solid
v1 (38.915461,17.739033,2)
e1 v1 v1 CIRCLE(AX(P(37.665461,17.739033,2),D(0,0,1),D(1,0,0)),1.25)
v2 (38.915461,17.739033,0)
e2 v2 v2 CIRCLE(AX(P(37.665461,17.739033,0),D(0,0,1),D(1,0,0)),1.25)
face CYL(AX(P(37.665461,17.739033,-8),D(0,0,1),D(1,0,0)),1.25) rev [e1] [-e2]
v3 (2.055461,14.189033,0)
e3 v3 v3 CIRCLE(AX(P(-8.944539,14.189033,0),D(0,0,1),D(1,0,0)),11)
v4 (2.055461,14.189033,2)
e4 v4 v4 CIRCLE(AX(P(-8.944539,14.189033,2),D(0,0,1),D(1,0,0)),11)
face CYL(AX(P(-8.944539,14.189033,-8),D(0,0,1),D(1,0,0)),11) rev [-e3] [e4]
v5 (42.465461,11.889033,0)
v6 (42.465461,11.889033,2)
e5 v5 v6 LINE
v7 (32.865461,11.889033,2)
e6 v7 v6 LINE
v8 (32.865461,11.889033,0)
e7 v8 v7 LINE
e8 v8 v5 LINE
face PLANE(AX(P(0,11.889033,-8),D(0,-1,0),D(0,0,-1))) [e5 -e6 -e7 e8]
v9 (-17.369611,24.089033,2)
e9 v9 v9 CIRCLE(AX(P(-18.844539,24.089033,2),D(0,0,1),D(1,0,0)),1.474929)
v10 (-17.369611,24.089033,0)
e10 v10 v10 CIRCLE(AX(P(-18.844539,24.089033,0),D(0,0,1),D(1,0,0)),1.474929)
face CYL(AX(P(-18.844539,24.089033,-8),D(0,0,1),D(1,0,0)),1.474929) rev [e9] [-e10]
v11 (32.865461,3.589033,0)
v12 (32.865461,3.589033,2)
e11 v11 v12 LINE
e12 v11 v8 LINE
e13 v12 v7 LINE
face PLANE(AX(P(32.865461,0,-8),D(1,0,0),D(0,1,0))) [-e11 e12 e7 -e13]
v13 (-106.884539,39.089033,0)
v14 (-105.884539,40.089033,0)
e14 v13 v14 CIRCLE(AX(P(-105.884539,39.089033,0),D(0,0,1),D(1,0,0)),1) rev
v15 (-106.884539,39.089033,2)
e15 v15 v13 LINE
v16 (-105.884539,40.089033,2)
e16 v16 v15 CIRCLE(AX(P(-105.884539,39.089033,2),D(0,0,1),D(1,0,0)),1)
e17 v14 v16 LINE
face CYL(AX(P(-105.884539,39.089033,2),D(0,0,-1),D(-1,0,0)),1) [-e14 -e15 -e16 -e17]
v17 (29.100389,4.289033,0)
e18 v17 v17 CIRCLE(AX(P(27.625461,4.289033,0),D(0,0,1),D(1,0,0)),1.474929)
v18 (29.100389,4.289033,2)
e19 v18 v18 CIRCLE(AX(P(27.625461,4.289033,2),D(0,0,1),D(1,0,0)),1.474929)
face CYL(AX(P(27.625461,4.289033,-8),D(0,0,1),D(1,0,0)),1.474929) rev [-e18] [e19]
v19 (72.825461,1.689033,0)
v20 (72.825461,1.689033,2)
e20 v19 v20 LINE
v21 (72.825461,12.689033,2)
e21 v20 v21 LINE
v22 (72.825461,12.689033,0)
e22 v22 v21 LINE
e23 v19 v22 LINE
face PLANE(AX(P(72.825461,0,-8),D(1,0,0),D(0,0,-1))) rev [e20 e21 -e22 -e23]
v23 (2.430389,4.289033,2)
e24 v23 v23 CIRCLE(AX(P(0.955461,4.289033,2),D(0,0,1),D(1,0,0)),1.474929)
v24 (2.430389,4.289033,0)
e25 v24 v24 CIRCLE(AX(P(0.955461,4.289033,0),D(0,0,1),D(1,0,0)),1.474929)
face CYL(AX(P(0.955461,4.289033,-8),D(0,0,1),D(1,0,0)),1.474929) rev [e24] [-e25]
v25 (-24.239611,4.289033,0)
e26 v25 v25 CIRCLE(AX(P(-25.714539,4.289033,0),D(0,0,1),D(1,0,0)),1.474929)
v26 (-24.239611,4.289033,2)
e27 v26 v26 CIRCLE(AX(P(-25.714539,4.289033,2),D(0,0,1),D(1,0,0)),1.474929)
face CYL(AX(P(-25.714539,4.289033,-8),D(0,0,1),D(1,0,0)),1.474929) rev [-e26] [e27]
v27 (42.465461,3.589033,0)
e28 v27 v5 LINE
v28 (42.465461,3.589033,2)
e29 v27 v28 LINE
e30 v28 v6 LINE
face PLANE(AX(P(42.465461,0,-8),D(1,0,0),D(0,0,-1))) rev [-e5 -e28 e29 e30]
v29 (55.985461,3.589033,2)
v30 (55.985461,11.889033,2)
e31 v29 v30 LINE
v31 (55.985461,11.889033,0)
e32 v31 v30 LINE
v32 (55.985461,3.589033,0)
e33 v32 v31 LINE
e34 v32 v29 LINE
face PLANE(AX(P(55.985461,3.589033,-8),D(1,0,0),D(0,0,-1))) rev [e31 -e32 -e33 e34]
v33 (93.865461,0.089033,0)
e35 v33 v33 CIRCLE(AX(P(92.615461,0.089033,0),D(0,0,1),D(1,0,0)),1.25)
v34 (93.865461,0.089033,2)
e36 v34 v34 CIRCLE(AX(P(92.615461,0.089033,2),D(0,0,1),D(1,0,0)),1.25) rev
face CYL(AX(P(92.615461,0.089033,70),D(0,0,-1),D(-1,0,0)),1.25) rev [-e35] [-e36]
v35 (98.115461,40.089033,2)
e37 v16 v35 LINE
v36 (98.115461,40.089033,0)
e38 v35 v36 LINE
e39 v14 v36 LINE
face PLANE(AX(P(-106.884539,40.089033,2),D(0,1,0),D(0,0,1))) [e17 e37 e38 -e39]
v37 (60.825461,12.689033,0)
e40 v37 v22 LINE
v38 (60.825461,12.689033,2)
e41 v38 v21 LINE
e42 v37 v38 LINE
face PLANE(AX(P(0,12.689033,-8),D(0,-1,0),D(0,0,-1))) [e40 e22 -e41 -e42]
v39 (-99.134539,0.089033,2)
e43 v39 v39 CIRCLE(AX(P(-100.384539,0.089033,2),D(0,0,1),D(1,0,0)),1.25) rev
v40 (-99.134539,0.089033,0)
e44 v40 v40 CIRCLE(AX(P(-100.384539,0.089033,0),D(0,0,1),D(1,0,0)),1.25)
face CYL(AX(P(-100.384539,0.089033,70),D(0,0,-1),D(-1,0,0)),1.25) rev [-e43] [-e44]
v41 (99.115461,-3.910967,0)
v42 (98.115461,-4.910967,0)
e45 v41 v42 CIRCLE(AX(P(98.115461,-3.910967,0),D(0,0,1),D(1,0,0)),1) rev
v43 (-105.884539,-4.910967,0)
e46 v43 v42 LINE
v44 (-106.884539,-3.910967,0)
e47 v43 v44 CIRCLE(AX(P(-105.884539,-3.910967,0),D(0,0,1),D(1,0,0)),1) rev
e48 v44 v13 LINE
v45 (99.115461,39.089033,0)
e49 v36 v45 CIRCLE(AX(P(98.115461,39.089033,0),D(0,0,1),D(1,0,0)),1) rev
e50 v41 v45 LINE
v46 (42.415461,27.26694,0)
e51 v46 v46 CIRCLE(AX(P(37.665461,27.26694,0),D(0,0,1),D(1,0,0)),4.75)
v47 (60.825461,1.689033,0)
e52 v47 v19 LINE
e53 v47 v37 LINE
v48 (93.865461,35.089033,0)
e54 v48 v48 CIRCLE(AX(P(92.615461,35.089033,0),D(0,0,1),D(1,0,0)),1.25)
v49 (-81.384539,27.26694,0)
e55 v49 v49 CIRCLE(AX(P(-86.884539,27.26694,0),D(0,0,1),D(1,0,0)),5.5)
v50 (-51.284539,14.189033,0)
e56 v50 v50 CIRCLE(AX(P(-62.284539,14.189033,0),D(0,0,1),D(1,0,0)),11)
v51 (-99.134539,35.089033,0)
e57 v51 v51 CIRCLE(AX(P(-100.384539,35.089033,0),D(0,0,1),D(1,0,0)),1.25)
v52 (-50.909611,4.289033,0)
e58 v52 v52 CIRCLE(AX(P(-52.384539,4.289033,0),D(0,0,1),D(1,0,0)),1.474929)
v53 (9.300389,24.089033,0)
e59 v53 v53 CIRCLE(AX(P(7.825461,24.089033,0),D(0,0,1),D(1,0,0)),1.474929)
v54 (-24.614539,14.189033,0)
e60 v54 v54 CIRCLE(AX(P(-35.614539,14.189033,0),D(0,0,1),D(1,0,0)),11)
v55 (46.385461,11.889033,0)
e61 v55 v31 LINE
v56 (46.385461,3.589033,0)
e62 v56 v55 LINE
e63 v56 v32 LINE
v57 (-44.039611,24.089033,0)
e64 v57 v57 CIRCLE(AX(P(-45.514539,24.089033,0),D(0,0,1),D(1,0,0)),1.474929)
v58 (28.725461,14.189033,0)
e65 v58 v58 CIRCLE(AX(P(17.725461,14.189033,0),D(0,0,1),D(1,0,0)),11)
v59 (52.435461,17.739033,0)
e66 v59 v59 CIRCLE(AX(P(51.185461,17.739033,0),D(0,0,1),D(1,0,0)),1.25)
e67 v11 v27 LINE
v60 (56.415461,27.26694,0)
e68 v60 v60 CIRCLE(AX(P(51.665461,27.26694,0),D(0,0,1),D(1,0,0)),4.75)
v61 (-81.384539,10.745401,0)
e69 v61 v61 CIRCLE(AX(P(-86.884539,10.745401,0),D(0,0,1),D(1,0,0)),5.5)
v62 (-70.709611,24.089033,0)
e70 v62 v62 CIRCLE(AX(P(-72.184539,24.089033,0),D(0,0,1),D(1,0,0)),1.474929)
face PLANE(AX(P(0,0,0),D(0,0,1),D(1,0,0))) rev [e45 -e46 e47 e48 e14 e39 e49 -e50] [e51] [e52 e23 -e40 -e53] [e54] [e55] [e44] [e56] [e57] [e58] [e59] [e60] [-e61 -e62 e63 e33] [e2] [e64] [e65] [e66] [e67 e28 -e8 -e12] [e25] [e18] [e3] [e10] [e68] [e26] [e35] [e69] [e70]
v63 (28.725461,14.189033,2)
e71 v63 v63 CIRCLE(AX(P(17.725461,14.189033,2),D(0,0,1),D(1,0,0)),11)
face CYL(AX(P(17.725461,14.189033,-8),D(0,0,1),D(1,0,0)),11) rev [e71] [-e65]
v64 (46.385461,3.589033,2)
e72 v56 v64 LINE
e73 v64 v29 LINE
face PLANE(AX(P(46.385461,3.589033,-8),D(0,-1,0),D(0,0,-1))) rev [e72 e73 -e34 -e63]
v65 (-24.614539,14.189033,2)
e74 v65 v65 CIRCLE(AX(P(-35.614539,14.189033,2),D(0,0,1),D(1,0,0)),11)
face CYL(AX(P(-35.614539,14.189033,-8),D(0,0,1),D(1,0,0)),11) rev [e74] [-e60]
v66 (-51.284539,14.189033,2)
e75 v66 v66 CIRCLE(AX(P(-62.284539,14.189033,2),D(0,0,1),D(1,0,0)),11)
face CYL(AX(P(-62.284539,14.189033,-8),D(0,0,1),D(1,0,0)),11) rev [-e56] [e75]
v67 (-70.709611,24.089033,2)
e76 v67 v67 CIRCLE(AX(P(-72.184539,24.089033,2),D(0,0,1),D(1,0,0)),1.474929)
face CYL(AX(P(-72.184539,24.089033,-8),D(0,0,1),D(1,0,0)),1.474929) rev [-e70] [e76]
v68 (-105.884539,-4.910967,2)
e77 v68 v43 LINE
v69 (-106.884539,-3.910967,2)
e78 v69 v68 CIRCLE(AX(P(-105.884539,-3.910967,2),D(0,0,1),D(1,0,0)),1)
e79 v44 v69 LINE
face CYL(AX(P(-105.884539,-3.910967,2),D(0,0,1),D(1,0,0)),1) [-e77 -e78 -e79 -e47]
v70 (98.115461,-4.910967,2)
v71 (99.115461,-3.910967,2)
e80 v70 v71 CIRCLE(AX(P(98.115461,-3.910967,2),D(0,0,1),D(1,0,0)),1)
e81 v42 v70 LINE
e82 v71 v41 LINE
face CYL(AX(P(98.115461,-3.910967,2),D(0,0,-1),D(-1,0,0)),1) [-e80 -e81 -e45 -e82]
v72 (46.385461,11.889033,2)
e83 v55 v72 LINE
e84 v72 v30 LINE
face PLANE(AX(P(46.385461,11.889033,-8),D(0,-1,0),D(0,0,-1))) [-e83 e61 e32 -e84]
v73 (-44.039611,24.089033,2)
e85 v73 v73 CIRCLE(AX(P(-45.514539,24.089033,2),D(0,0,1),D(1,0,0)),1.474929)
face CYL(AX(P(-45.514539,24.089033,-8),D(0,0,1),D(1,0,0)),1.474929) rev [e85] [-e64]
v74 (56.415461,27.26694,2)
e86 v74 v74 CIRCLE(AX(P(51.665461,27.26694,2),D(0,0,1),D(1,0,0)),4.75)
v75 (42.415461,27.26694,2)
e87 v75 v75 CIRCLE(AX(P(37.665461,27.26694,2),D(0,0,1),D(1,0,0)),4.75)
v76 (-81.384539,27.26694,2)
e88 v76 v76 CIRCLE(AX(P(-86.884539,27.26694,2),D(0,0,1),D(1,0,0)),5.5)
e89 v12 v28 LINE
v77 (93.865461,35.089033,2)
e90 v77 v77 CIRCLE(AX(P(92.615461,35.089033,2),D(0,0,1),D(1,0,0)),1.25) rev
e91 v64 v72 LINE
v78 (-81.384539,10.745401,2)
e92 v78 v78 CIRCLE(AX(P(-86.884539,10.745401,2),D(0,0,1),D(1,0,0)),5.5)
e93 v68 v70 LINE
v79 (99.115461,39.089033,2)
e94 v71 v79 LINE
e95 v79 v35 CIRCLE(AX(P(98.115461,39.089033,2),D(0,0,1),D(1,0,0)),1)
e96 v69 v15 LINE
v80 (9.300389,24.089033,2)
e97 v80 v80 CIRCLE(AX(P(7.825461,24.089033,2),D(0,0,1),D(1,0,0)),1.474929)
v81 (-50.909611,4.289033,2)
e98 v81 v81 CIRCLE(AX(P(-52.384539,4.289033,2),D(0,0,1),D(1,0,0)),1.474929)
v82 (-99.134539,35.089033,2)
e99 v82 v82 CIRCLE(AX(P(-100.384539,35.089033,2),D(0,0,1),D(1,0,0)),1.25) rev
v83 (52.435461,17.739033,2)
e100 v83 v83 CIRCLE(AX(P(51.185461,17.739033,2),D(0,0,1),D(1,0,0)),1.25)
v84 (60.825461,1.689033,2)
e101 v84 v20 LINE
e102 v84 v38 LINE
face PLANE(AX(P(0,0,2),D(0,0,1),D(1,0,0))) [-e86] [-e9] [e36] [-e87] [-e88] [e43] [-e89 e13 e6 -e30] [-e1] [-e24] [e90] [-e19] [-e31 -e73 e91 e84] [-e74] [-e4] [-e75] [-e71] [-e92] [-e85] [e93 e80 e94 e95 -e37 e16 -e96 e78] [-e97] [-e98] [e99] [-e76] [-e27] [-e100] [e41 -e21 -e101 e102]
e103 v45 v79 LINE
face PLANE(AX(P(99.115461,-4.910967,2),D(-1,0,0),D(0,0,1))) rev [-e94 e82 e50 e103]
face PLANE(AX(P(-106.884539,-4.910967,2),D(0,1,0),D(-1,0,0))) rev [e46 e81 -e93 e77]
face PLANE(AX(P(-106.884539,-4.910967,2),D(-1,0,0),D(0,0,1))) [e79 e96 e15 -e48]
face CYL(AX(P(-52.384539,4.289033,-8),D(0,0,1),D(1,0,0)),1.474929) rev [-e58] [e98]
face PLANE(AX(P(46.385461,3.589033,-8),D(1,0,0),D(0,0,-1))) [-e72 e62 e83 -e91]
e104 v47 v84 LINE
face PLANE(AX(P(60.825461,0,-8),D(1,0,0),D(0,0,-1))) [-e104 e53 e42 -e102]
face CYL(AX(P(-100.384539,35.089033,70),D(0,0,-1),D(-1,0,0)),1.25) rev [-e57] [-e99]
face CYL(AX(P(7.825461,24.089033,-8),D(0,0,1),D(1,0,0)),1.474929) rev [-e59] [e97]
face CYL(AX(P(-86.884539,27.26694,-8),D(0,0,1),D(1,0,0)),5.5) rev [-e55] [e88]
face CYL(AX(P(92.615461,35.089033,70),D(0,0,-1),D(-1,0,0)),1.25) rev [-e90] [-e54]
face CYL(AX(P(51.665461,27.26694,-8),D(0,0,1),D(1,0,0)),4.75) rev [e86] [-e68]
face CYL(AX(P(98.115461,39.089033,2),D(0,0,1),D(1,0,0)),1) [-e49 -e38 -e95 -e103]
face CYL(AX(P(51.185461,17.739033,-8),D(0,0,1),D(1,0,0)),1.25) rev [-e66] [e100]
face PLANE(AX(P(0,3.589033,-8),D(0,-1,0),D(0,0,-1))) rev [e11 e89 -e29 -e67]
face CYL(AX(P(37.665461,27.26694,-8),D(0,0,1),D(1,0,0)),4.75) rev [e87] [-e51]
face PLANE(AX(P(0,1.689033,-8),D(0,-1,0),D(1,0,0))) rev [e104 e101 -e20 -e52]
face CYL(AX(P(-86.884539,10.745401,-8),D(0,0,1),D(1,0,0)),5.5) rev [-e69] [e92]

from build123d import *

# Parameters (mm, degrees)
SKETCH_5_W          = 206
SKETCH_5_H          = 45
EXTRUDE_3_DEPTH     = 2
SKETCH_6_W          = 9.6
SKETCH_6_H          = 8.3
SKETCH_6_R          = 11
SKETCH_6_R_2        = 1.474928536
SKETCH_6_R_3        = 1.25
SKETCH_6_R_4        = 4.75
SKETCH_6_R_5        = 5.5
CUT_EXTRUDE_1_DEPTH = 10
SKETCH_1_R          = 1.25
CUT_EXTRUDE_7_DEPTH = 70
FILLET_1_R          = 1


with BuildPart() as part:
    # 草图5 → 凸台-拉伸3 (new body)
    with BuildSketch(Plane.XY):
        with Locations((-3.884539257, 17.589033065)):
            Rectangle(SKETCH_5_W, SKETCH_5_H)
    extrude(amount=EXTRUDE_3_DEPTH)

    # 草图6 → 切除-拉伸1 (cut)
    with BuildSketch(Plane.XY.offset(2)):
        Polygon((60.825460743, 12.689033065), (60.825460743, 1.689033065), (72.825460743, 1.689033065), (72.825460743, 10.089033065), (72.825460743, 12.689033065), align=None)
        with Locations((37.665460743, 7.739033065)):
            Rectangle(SKETCH_6_W, SKETCH_6_H)
        with Locations((51.185460743, 7.739033065)):
            Rectangle(SKETCH_6_W, SKETCH_6_H)
        with Locations((-62.284539257, 14.189033065)):
            Circle(SKETCH_6_R)
        with Locations((-35.614539257, 14.189033065)):
            Circle(SKETCH_6_R)
        with Locations((-8.944539257, 14.189033065)):
            Circle(SKETCH_6_R)
        with Locations((17.725460743, 14.189033065)):
            Circle(SKETCH_6_R)
        with Locations((-72.184539257, 24.089033065)):
            Circle(SKETCH_6_R_2)
        with Locations((-52.384539257, 4.289033065)):
            Circle(SKETCH_6_R_2)
        with Locations((-45.514539257, 24.089033065)):
            Circle(SKETCH_6_R_2)
        with Locations((-25.714539257, 4.289033065)):
            Circle(SKETCH_6_R_2)
        with Locations((-18.844539257, 24.089033065)):
            Circle(SKETCH_6_R_2)
        with Locations((0.955460743, 4.289033065)):
            Circle(SKETCH_6_R_2)
        with Locations((7.825460743, 24.089033065)):
            Circle(SKETCH_6_R_2)
        with Locations((27.625460743, 4.289033065)):
            Circle(SKETCH_6_R_2)
        with Locations((37.665460743, 17.739033065)):
            Circle(SKETCH_6_R_3)
        with Locations((51.185460743, 17.739033065)):
            Circle(SKETCH_6_R_3)
        with Locations((51.665460743, 27.26693986)):
            Circle(SKETCH_6_R_4)
        with Locations((37.665460743, 27.26693986)):
            Circle(SKETCH_6_R_4)
        with Locations((-86.884539257, 27.26693986)):
            Circle(SKETCH_6_R_5)
        with Locations((-86.884539257, 10.74540099)):
            Circle(SKETCH_6_R_5)
    extrude(amount=-CUT_EXTRUDE_1_DEPTH, mode=Mode.SUBTRACT)

    # 草图1 → 切除-拉伸7 (cut)
    with BuildSketch(Plane.XY):
        with Locations((-100.384539257, 35.089033065)):
            Circle(SKETCH_1_R)
        with Locations((-100.384539257, 0.089033065)):
            Circle(SKETCH_1_R)
        with Locations((92.615460743, 0.089033065)):
            Circle(SKETCH_1_R)
        with Locations((92.615460743, 35.089033065)):
            Circle(SKETCH_1_R)
    extrude(amount=CUT_EXTRUDE_7_DEPTH, mode=Mode.SUBTRACT)

    # 圆角1
    fillet_1_edges = [part.edges().sort_by_distance(p)[0] for p in [
        (-106.884539257, -4.910966935, 1),
        (-106.884539257, 40.089033065, 1),
        (99.115460743, -4.910966935, 1),
        (99.115460743, 40.089033065, 1),
    ]]
    fillet(fillet_1_edges, radius=FILLET_1_R)


solid = part.part
